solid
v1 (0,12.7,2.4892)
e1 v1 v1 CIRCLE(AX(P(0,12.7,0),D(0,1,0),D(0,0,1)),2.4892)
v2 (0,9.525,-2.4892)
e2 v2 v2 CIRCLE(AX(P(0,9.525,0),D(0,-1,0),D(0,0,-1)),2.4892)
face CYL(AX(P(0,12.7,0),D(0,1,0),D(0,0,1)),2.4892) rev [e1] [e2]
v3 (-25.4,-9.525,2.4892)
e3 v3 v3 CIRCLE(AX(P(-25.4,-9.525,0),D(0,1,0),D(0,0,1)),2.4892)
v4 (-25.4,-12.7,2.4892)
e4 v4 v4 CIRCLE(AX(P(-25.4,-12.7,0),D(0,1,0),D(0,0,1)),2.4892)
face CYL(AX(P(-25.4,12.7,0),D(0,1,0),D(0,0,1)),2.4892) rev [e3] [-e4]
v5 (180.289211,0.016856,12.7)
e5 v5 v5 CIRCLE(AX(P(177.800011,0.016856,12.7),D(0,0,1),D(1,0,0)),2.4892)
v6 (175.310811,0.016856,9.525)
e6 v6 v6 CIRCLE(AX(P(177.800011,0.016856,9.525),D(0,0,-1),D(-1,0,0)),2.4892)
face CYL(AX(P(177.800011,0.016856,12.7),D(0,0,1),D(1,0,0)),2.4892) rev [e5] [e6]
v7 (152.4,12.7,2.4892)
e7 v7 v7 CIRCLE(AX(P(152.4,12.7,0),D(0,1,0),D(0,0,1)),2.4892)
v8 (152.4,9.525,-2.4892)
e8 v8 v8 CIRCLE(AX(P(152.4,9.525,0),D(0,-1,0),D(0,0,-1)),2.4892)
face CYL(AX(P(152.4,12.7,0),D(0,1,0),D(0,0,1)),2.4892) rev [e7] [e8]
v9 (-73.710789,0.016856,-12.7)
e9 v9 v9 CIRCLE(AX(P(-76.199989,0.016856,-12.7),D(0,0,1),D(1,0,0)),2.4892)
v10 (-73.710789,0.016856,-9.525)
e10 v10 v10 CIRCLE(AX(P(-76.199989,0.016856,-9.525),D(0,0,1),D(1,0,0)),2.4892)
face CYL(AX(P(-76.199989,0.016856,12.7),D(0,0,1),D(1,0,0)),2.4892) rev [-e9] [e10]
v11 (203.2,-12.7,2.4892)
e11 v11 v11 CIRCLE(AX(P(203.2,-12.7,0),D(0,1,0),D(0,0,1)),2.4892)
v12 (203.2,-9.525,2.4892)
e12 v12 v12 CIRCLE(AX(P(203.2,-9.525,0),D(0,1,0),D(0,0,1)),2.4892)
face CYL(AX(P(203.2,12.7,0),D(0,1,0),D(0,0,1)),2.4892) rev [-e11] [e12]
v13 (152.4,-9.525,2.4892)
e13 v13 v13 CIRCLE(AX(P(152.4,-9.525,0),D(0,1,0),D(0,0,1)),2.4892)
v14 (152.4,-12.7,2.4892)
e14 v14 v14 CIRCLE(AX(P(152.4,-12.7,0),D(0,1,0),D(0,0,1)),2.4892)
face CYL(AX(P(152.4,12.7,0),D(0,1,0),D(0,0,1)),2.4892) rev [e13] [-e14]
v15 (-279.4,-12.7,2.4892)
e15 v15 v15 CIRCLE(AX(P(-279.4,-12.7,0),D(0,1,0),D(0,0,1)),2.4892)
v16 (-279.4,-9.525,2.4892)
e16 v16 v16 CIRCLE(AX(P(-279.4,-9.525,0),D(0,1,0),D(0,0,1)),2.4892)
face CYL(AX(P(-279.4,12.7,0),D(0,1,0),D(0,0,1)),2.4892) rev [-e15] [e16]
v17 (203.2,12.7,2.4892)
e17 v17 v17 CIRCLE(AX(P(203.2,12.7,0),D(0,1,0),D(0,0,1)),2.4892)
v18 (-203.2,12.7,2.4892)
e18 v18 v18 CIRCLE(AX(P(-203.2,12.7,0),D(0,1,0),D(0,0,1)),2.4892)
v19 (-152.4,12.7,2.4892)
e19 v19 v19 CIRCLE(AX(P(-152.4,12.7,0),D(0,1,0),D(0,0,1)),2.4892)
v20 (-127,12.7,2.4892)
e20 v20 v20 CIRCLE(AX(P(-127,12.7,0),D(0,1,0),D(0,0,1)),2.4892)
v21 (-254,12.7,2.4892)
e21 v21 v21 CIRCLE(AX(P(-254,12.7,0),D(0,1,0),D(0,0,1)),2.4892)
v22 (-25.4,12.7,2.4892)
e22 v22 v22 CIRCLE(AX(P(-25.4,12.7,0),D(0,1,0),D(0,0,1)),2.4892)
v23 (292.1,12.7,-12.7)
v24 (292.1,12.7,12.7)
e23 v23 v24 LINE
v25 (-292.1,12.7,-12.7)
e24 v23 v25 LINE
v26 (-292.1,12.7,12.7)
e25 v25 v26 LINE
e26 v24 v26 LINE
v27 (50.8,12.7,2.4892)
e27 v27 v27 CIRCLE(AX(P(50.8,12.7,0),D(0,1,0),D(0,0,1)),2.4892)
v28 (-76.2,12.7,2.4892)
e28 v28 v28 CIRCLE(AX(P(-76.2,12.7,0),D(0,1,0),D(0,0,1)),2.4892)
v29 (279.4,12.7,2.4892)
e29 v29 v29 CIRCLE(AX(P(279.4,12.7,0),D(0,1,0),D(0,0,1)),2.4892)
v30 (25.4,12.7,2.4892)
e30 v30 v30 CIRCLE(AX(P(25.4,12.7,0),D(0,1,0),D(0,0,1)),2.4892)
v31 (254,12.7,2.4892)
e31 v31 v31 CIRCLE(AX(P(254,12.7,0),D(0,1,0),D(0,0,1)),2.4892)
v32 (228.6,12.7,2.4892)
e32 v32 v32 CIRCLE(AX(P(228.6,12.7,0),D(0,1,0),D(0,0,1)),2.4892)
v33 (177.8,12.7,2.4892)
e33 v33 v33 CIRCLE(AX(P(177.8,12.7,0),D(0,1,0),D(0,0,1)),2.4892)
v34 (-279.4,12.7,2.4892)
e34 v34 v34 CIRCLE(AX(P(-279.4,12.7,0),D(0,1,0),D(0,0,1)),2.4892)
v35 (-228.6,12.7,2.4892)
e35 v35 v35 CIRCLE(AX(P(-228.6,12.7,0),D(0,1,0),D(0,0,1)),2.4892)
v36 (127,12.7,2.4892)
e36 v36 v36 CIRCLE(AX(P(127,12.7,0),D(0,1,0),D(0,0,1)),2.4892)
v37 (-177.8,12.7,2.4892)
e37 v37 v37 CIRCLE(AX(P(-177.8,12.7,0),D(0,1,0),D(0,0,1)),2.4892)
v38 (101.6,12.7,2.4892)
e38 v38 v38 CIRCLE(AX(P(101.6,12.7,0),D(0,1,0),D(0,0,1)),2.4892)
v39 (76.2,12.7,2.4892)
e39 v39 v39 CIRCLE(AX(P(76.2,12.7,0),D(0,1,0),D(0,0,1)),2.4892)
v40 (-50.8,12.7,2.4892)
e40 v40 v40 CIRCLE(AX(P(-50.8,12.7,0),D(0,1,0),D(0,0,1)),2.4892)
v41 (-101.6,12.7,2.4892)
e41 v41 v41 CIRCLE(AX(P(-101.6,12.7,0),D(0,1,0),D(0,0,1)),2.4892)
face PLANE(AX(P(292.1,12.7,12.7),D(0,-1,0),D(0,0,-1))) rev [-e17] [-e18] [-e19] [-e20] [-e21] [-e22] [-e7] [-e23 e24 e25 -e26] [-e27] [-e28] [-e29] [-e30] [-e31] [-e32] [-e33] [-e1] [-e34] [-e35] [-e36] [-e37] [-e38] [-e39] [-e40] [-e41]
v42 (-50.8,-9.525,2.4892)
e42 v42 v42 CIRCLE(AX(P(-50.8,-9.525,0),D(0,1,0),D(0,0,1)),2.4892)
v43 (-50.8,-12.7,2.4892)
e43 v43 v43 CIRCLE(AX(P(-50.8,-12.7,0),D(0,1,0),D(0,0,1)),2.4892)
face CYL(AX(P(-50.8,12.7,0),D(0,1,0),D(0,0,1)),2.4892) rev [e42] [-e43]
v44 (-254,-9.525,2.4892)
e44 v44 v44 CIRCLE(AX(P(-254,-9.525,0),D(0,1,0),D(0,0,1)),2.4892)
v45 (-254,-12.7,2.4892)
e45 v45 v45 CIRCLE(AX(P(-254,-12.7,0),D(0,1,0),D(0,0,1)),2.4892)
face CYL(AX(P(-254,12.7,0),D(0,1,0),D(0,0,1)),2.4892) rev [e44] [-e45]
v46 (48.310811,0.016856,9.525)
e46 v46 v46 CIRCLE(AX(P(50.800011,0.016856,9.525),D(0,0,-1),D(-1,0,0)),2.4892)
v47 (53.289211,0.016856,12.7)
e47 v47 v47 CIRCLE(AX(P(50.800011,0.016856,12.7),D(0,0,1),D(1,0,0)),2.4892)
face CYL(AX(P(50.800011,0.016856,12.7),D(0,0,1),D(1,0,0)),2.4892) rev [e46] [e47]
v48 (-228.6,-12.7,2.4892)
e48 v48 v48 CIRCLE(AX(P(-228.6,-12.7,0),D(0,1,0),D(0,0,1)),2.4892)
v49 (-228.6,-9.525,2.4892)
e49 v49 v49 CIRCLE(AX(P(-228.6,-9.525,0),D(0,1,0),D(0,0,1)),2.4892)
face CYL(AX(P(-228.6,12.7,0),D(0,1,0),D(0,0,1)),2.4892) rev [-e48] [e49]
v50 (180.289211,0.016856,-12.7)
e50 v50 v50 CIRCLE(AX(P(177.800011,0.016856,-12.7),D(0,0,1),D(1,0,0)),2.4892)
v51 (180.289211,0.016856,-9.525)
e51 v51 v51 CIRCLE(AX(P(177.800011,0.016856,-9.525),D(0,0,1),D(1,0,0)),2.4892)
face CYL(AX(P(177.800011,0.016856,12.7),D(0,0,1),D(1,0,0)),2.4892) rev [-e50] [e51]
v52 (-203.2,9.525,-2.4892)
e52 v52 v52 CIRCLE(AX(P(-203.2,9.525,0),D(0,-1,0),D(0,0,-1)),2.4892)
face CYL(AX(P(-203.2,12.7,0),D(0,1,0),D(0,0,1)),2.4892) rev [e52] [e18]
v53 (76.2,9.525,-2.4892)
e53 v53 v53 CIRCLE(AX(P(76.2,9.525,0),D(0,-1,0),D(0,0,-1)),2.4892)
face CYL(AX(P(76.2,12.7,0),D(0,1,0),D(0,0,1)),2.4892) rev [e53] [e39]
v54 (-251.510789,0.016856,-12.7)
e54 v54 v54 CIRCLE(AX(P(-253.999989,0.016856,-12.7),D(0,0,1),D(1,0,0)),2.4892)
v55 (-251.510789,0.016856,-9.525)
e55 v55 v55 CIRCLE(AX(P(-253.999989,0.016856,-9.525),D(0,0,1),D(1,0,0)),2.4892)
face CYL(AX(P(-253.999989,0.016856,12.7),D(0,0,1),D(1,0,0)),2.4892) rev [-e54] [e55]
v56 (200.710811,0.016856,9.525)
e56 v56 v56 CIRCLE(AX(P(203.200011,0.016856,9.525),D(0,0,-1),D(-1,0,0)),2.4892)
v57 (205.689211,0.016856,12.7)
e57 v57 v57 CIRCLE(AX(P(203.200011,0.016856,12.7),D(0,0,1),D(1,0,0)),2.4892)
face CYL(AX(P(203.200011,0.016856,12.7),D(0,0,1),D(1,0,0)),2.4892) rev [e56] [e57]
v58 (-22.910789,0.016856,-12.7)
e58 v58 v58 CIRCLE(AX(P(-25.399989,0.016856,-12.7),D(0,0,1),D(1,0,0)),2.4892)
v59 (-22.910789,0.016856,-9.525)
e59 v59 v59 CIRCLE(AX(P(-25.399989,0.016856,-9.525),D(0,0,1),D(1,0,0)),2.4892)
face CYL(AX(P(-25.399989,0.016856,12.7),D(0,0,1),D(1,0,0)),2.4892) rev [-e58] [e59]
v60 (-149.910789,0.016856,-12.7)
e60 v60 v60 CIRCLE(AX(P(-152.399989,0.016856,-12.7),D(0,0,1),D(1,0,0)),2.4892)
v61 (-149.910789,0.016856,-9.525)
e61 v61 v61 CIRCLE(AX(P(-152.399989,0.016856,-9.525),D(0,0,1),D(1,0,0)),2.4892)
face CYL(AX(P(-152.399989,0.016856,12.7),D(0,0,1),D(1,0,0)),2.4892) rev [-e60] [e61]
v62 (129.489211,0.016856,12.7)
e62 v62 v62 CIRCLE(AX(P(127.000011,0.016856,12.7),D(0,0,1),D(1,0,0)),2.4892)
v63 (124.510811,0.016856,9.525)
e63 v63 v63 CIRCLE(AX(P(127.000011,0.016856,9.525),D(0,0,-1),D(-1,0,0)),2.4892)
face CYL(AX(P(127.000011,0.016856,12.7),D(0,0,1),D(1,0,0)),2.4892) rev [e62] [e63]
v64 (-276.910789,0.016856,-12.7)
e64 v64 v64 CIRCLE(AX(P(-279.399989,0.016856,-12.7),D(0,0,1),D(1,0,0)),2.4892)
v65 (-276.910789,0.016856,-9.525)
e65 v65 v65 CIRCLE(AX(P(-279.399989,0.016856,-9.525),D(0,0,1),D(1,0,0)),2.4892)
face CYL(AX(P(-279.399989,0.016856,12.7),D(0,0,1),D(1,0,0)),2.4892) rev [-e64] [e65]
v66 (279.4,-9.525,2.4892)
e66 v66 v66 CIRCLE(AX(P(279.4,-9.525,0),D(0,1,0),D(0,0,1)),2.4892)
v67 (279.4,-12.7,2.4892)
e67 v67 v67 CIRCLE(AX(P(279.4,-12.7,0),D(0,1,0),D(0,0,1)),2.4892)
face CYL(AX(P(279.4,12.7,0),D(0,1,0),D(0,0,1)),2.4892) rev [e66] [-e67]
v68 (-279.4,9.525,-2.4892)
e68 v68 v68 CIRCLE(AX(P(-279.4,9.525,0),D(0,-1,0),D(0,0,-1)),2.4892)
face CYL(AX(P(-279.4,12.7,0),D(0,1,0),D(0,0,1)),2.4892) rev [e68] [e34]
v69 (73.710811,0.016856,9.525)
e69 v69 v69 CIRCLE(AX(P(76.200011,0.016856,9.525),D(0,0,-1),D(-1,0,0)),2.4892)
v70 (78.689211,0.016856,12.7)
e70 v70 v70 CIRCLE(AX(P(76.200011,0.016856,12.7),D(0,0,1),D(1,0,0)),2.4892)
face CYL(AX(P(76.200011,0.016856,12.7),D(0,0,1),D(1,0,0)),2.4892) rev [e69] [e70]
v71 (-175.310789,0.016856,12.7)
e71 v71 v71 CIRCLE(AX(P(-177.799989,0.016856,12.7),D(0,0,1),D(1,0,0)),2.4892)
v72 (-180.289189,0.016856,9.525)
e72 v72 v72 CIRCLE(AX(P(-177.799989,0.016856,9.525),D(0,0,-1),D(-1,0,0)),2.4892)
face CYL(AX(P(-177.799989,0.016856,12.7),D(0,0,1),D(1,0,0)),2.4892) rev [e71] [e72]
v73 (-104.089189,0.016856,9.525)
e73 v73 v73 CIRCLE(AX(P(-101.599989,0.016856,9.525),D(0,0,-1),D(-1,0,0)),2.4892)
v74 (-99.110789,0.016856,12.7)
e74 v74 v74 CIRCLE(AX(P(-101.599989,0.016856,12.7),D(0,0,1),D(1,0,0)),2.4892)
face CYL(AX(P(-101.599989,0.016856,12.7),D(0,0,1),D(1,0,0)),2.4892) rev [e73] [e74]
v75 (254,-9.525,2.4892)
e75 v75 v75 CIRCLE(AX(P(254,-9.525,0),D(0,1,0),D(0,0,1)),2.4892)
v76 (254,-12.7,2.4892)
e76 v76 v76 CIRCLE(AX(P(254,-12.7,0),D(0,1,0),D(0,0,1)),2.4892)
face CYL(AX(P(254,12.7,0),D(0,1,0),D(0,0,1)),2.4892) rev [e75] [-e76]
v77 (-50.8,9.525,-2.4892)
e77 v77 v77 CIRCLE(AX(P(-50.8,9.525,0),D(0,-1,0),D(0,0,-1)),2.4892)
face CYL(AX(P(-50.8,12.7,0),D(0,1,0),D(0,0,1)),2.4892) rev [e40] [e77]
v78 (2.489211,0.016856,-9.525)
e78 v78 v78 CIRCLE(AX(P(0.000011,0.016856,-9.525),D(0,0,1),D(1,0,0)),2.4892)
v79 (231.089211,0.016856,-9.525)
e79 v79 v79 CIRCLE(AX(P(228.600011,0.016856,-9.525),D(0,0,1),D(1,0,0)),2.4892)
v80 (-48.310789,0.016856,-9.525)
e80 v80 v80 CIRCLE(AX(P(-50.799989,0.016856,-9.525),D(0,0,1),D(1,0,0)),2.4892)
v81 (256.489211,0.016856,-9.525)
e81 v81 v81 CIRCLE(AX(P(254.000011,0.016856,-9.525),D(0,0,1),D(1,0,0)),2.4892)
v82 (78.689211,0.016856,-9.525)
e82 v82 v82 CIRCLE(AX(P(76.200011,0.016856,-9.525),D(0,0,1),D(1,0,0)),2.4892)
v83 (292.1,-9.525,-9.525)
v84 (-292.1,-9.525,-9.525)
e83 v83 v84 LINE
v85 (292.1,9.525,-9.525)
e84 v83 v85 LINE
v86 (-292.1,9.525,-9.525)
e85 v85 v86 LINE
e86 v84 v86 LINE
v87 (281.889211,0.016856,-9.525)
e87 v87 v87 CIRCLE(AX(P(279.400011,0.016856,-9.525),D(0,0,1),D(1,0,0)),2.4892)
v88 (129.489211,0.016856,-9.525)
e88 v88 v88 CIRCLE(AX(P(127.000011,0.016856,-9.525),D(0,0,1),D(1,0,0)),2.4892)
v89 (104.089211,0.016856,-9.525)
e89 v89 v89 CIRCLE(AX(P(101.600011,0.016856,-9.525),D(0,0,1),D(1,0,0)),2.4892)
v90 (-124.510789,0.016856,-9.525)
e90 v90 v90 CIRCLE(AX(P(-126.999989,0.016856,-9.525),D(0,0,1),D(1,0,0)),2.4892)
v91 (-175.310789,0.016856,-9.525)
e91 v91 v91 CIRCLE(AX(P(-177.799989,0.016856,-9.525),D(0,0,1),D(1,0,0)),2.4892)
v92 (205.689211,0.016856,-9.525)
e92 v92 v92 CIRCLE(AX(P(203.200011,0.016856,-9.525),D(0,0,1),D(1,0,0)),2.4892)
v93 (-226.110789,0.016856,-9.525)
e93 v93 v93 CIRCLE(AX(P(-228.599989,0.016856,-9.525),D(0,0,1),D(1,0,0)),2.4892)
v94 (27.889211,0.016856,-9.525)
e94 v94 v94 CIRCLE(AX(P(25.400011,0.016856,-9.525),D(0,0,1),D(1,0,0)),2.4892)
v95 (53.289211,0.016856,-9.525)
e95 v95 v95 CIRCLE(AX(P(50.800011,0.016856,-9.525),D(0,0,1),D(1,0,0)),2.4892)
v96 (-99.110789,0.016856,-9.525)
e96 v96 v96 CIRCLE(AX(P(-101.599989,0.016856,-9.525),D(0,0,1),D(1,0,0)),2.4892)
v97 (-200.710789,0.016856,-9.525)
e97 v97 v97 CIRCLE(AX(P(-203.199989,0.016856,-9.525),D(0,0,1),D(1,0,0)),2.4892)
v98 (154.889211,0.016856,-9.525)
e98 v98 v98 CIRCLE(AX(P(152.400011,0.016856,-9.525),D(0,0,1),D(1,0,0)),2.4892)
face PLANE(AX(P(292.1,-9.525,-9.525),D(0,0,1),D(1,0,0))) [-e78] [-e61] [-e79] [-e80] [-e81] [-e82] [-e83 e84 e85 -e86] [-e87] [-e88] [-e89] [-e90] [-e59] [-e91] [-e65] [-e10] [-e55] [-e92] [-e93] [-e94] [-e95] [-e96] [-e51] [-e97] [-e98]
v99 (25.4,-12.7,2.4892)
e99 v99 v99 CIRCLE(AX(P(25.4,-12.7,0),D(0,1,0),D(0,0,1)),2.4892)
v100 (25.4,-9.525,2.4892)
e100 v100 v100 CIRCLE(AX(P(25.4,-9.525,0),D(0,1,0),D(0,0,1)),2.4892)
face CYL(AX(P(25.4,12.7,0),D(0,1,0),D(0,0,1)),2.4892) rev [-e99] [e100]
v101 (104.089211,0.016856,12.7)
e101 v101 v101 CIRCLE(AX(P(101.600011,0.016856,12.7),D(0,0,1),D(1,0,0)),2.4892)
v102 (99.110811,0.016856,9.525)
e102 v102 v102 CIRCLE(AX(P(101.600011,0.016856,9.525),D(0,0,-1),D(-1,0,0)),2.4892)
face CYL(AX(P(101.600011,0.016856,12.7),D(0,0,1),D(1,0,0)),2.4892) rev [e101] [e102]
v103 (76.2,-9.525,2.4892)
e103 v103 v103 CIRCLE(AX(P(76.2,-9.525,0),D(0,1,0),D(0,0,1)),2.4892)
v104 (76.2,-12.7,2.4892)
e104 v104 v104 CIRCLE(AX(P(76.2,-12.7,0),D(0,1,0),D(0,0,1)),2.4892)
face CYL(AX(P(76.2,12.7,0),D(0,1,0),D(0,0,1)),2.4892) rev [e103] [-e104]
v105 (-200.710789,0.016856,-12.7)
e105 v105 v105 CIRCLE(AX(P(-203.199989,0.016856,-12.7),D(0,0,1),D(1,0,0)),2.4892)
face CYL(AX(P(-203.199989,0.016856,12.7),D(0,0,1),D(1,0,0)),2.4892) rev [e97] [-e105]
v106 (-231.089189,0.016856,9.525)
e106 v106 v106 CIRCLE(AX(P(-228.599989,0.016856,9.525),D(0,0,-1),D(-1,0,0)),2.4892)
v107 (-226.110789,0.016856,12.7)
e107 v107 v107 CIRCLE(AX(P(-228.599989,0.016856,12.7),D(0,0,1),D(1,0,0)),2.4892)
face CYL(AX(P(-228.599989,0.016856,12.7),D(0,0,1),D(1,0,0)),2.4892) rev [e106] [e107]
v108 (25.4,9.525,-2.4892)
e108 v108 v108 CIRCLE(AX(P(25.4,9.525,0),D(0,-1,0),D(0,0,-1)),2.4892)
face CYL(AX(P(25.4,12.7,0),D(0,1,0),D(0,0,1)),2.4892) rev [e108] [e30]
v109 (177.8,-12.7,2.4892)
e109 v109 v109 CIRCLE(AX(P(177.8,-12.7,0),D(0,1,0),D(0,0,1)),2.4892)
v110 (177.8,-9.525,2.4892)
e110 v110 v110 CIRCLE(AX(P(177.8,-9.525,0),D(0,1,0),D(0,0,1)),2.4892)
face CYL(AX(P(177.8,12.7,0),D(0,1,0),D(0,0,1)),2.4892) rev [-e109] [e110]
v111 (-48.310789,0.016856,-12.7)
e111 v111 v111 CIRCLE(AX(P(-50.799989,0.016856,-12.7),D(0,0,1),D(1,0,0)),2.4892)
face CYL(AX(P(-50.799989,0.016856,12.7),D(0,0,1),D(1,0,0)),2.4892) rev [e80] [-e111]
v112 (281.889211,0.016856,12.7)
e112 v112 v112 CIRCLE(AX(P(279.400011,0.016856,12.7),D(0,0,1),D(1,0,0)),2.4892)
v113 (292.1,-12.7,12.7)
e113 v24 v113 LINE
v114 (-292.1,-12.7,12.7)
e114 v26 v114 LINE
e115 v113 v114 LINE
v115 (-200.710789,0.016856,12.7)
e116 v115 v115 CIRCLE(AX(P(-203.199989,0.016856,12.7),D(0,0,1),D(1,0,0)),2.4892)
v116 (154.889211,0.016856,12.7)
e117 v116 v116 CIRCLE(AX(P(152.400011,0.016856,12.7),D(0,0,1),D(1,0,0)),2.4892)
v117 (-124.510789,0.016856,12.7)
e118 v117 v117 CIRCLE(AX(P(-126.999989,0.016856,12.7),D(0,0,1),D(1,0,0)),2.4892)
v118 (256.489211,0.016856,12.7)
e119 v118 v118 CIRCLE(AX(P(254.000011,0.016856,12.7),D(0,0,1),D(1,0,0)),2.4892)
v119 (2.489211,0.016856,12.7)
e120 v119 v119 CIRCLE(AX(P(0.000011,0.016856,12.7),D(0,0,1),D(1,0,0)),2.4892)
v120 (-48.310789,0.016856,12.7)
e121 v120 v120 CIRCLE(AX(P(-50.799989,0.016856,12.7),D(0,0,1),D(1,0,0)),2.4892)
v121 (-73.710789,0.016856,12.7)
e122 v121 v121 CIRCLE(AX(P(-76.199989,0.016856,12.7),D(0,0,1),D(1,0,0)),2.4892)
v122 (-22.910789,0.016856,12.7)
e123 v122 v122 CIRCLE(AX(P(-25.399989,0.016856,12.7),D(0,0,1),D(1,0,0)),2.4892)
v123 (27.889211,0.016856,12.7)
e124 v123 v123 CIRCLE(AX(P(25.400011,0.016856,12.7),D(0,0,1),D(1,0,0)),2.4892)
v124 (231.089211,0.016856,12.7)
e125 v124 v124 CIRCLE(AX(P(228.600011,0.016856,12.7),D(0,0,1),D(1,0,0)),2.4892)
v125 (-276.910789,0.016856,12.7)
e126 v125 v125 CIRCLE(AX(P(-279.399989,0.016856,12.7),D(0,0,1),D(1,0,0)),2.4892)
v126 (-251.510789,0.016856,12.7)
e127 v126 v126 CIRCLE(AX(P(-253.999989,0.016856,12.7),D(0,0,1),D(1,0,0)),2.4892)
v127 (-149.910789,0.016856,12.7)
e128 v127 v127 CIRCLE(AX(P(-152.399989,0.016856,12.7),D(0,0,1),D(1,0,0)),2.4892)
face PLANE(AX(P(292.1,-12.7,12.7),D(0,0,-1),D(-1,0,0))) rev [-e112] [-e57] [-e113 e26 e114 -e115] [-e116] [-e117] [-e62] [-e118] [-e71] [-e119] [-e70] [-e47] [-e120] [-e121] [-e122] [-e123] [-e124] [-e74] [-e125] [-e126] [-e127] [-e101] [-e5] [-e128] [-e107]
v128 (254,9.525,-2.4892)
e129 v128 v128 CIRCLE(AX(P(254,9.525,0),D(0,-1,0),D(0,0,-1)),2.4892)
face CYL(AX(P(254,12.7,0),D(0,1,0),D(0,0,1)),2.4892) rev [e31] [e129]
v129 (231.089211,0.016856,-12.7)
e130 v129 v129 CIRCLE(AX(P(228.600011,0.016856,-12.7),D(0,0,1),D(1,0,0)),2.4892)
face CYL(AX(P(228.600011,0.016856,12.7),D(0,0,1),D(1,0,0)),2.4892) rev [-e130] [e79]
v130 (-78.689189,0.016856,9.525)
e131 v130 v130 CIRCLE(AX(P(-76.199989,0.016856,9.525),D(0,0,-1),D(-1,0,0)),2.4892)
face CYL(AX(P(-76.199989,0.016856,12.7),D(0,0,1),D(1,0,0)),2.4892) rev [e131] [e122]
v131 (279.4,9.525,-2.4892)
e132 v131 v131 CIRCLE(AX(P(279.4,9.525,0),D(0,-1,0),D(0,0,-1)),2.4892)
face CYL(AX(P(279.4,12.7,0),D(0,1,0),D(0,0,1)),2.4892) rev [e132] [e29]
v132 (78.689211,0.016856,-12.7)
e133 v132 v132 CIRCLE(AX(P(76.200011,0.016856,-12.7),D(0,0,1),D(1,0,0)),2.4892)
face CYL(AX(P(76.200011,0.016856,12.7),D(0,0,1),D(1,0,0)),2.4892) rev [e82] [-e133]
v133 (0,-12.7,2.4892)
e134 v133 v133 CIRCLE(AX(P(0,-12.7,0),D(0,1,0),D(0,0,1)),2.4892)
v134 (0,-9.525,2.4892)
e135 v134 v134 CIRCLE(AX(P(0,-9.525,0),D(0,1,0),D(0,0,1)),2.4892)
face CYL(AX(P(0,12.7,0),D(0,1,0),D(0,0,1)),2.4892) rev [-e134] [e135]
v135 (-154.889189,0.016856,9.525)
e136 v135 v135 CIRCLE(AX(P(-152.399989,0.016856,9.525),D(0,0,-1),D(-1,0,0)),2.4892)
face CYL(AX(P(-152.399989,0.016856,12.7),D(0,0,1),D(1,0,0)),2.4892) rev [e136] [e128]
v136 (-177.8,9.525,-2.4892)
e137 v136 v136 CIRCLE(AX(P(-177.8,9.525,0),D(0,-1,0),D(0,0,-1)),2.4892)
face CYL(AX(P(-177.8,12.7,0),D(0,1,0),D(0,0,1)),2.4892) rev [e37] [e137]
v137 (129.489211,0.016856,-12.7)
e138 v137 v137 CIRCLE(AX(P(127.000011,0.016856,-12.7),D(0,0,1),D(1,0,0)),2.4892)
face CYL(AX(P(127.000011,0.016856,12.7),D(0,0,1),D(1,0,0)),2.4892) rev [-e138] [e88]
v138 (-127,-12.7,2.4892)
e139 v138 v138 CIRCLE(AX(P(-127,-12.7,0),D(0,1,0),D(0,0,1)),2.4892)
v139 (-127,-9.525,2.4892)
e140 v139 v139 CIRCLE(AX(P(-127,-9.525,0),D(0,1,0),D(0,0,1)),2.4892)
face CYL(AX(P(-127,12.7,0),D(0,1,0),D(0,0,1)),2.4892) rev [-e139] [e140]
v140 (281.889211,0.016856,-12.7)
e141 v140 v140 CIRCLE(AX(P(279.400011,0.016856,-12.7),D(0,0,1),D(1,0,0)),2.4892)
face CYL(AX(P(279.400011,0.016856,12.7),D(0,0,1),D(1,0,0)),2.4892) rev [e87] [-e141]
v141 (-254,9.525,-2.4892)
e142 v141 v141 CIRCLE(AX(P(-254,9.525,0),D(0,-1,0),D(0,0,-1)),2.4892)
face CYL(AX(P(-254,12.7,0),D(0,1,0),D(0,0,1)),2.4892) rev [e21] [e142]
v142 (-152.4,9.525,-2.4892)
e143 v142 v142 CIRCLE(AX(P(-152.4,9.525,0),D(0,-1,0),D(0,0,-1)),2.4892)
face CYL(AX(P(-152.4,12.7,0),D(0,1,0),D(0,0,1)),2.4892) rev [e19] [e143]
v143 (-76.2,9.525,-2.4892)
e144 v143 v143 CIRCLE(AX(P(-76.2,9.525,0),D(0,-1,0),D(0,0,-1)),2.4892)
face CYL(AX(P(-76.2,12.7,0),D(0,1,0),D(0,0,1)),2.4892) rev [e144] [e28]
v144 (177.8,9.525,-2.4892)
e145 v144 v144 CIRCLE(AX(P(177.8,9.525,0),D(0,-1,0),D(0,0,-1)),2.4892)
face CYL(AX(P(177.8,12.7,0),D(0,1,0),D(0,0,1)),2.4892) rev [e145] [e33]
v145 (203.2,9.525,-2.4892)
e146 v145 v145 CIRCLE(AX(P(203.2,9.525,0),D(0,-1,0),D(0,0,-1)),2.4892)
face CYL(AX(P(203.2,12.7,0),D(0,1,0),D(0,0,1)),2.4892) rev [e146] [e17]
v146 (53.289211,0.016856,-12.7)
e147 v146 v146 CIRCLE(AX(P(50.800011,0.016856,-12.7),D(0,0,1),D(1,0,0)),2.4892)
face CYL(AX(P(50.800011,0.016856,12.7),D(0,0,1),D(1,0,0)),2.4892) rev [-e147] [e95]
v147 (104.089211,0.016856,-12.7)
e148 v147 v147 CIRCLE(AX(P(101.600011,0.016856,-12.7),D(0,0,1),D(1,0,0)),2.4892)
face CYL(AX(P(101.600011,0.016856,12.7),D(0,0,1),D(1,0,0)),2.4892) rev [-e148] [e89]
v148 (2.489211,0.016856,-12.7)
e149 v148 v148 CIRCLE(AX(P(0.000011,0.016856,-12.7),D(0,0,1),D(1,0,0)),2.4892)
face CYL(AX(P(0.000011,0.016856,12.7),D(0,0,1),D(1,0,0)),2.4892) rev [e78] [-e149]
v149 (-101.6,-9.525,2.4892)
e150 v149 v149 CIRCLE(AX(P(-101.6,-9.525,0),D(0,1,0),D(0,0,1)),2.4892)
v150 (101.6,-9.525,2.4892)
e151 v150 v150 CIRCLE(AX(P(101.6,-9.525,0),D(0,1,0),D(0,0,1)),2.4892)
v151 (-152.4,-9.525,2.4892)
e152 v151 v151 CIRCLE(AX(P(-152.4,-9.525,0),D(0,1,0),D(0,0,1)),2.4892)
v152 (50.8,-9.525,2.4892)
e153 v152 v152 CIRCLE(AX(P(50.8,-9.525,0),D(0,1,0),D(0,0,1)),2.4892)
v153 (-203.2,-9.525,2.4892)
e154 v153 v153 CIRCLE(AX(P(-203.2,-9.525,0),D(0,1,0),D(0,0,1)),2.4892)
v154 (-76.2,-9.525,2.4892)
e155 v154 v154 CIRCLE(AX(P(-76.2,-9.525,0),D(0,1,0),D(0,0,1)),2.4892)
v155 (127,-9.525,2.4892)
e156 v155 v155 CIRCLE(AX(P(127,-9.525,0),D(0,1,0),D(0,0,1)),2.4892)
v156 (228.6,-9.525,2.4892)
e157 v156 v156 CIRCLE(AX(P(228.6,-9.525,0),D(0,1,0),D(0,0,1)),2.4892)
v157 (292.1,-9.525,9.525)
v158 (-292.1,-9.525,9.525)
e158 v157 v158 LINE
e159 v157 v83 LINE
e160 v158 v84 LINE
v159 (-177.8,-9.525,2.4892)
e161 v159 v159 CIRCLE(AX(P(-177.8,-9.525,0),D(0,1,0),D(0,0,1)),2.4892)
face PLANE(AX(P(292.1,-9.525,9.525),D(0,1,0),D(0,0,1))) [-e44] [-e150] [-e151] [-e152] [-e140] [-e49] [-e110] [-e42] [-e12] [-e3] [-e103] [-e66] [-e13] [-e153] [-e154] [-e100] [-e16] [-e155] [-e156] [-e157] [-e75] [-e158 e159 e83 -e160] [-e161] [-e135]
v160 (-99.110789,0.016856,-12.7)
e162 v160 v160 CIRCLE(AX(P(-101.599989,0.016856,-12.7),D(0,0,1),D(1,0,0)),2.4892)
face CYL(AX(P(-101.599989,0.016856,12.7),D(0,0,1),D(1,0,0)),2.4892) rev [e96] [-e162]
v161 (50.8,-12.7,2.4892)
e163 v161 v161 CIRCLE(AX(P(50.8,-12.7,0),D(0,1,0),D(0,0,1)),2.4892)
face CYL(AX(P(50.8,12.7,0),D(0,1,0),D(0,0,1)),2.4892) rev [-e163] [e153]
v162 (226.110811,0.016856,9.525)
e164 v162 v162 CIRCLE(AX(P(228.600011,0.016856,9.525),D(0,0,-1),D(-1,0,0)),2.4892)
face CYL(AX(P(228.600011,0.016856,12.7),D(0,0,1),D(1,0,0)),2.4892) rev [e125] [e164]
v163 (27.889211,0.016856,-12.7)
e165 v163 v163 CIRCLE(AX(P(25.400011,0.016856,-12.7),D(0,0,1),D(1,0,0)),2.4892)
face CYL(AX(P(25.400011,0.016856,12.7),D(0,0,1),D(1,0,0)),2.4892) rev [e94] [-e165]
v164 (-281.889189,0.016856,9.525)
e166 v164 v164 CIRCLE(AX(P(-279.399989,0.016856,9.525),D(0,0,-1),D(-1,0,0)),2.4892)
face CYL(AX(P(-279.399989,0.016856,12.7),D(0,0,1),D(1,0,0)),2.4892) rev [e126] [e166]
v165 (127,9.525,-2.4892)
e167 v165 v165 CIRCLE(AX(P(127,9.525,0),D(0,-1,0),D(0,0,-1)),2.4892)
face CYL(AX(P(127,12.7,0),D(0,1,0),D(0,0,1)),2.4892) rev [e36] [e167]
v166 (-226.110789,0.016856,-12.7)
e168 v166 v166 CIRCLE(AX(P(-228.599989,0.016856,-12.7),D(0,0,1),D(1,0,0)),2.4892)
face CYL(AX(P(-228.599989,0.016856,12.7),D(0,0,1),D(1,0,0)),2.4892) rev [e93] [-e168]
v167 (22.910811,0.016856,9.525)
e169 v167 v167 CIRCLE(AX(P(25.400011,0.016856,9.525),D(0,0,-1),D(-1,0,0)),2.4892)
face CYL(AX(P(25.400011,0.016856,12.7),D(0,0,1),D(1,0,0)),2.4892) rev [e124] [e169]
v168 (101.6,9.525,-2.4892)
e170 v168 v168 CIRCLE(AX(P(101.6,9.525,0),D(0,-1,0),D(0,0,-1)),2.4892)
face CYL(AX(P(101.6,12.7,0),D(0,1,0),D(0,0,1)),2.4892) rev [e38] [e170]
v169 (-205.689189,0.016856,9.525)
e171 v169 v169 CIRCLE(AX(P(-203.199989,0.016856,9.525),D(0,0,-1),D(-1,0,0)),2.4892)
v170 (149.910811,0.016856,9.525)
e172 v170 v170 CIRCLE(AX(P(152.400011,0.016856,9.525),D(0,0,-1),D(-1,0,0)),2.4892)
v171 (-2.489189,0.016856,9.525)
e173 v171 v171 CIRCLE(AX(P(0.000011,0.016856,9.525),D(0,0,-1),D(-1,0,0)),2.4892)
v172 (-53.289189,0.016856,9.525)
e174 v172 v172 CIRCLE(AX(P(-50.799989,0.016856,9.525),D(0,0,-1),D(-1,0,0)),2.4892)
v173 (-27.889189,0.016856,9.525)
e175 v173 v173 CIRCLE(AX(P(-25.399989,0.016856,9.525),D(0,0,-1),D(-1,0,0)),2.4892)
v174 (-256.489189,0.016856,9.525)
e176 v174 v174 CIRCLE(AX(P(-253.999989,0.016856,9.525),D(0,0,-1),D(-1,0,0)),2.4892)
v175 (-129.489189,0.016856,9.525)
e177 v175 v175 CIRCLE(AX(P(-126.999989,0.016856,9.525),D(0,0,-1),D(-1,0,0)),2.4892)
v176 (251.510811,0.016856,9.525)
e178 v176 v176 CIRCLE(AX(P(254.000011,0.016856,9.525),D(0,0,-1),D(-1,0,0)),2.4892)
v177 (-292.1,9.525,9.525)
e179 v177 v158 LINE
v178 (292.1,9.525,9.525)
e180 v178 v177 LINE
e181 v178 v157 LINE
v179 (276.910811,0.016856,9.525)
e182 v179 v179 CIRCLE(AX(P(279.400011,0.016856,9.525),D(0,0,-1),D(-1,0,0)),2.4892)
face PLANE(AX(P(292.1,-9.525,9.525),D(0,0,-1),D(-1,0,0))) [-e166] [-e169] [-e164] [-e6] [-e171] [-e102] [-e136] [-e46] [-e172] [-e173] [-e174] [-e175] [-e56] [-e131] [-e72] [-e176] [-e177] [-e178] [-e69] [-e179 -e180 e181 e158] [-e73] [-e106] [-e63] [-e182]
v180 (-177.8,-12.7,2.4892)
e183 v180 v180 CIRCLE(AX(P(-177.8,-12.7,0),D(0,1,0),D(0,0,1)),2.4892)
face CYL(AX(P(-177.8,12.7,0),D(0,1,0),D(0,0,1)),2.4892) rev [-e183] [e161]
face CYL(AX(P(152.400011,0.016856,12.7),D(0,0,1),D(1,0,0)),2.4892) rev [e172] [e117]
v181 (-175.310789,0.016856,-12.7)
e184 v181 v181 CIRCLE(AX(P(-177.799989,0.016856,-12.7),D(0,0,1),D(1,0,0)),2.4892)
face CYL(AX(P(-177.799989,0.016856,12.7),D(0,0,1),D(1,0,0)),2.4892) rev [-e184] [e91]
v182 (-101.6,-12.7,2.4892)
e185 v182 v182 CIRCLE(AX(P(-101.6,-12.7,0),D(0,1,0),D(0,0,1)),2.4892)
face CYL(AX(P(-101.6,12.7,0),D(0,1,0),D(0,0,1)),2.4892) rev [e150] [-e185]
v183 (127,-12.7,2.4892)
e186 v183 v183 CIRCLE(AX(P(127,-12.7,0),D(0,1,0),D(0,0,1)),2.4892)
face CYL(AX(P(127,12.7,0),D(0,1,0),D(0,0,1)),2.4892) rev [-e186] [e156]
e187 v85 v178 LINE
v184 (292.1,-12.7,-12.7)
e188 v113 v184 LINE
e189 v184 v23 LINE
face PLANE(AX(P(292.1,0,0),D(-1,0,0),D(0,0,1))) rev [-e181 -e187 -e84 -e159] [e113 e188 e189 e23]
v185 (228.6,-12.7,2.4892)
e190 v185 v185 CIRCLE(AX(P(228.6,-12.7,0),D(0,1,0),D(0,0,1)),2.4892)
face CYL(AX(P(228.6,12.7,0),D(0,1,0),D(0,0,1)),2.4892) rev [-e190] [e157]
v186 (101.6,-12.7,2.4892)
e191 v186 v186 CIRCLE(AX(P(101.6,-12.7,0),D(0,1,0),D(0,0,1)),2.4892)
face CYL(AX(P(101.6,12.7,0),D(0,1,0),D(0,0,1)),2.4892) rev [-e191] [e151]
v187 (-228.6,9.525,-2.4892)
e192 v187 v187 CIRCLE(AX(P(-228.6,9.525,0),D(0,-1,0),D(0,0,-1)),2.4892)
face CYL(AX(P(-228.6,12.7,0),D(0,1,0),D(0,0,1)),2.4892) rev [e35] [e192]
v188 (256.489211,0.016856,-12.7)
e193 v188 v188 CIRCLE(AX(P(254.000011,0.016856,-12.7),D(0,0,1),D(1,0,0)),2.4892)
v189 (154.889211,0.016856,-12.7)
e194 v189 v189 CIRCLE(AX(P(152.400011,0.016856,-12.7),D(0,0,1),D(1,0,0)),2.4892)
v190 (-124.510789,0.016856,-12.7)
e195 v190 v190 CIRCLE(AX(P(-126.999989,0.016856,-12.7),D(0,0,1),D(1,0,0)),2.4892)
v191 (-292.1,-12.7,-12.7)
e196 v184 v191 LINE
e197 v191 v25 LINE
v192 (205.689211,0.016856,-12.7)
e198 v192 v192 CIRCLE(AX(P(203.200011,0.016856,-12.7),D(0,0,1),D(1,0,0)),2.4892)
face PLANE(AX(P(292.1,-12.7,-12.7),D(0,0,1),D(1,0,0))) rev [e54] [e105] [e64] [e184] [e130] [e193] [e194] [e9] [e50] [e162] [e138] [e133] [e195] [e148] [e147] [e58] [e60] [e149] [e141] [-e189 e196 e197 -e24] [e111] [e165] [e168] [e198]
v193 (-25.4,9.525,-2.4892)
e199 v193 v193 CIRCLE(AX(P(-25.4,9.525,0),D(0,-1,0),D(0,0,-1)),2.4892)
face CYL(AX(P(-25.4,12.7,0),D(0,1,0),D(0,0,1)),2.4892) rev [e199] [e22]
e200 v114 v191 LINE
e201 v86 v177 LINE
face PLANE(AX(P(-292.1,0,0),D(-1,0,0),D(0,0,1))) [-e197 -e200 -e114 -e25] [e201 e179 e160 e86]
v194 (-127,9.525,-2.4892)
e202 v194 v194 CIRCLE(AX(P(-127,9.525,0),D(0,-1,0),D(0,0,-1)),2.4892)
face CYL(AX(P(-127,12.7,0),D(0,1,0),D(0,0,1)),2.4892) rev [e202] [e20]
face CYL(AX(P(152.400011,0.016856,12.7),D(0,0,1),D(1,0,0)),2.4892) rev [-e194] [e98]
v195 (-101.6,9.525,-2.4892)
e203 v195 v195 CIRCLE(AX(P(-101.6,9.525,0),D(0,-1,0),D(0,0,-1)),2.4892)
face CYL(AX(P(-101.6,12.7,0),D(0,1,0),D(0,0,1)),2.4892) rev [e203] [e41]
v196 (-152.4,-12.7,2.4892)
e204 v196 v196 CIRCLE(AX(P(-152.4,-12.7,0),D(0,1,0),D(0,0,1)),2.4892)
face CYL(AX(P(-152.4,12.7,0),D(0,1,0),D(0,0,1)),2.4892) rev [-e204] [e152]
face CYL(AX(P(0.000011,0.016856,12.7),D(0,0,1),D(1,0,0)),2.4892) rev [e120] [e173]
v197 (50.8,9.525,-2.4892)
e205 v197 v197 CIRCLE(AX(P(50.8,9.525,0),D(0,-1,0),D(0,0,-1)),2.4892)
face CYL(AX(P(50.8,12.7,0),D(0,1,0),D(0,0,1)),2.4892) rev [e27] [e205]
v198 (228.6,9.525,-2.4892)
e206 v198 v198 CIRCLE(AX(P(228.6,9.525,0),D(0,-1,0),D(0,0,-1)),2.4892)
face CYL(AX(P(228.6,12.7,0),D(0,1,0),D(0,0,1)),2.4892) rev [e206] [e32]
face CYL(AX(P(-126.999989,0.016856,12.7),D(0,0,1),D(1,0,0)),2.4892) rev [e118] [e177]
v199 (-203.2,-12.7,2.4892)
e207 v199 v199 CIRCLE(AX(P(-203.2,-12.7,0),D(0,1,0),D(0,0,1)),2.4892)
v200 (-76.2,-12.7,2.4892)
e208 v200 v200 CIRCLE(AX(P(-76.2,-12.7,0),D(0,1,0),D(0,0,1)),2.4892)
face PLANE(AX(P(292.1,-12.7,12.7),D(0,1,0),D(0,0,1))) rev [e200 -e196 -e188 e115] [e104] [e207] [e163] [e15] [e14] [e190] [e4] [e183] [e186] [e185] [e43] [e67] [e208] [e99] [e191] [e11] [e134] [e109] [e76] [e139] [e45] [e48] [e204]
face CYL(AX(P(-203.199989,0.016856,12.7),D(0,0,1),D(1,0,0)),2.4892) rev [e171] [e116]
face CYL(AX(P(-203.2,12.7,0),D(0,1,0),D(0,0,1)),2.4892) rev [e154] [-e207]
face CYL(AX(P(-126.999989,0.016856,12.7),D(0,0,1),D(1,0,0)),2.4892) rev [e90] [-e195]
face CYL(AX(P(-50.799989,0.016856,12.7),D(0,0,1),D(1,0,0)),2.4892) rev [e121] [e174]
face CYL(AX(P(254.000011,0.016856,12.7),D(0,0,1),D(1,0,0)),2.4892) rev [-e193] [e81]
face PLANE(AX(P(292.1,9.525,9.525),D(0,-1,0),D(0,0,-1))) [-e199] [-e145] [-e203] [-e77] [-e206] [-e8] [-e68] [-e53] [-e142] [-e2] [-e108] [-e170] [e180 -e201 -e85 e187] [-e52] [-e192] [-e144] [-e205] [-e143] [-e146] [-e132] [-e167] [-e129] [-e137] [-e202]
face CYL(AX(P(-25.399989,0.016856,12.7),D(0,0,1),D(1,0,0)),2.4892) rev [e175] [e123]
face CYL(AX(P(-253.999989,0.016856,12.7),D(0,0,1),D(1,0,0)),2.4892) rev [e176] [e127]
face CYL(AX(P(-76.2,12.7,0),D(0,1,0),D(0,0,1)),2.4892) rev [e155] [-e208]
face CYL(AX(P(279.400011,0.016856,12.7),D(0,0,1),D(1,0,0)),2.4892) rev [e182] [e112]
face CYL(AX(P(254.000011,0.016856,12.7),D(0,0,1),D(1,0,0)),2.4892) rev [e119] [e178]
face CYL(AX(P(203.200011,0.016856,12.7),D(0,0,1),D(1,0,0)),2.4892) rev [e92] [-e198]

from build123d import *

# Parameters (mm, degrees)
SKETCH1_W             = 25.4
SKETCH1_H             = 25.4
SKETCH1_W_2           = 19.05
SKETCH1_H_2           = 19.05
BOSS_EXTRUDE1_DEPTH   = 292.1
SKETCH3_W             = 2.4892
SKETCH3_H             = 25.4
SKETCH3_AT_POINT_2_W  = 2.4892
SKETCH3_AT_POINT_2_H  = 25.4
LPATTERN1_START       = -12.7
LPATTERN1_OUTLINE_R   = 2.4892
LPATTERN1_DEPTH       = 25.4
LPATTERN1_2_OUTLINE_R = 2.4892
LPATTERN1_2_DEPTH     = 25.4


# Read off the part's stored shape, not the designer's step: LPattern1
with BuildPart() as part:
    # Sketch1 → Boss-Extrude1 (new, symmetric)
    with BuildSketch(Plane(origin=(0, 0, 0), x_dir=(0, 0, -1), z_dir=(1, 0, 0))):
        Rectangle(SKETCH1_W, SKETCH1_H)
        Rectangle(SKETCH1_W_2, SKETCH1_H_2, mode=Mode.SUBTRACT)
    extrude(amount=BOSS_EXTRUDE1_DEPTH, both=True)

    # Sketch3 → #9 (0.196) Diameter Hole1 (revolve, cut)
    with BuildSketch(Plane(origin=(279.4, 12.7, 0), x_dir=(0, 0, 1), z_dir=(1, 0, 0))):
        with Locations((1.2446, 12.7)):
            Rectangle(SKETCH3_W, SKETCH3_H)
    revolve(axis=Axis((279.4, 19.05, 0), (0, -1, 0)), mode=Mode.SUBTRACT)

    # Sketch3 at point 2 (carried to point 2, square into its face) → #9 (0.196) Diameter Hole1 at 2 (revolve, cut)
    with BuildSketch(Plane(origin=(279.400011186, 0.016856195, 12.7), x_dir=(0, -1, 0), z_dir=(1, 0, 0))):
        with Locations((1.2446, 12.7)):
            Rectangle(SKETCH3_AT_POINT_2_W, SKETCH3_AT_POINT_2_H)
    revolve(axis=Axis((279.400011186, 0.016856195, 19.05), (0, 0, -1)), mode=Mode.SUBTRACT)

    # LPattern1 outline → LPattern1 (cut)
    with BuildSketch(Plane.XY.offset(LPATTERN1_START)):
        with Locations((254.000011186, 0.016856195)):
            Circle(LPATTERN1_OUTLINE_R)
        with Locations((228.600011186, 0.016856195)):
            Circle(LPATTERN1_OUTLINE_R)
        with Locations((203.200011186, 0.016856195)):
            Circle(LPATTERN1_OUTLINE_R)
        with Locations((177.800011186, 0.016856195)):
            Circle(LPATTERN1_OUTLINE_R)
        with Locations((152.400011186, 0.016856195)):
            Circle(LPATTERN1_OUTLINE_R)
        with Locations((127.000011186, 0.016856195)):
            Circle(LPATTERN1_OUTLINE_R)
        with Locations((101.600011186, 0.016856195)):
            Circle(LPATTERN1_OUTLINE_R)
        with Locations((76.200011186, 0.016856195)):
            Circle(LPATTERN1_OUTLINE_R)
        with Locations((50.800011186, 0.016856195)):
            Circle(LPATTERN1_OUTLINE_R)
        with Locations((25.400011186, 0.016856195)):
            Circle(LPATTERN1_OUTLINE_R)
        with Locations((1.1186e-05, 0.016856195)):
            Circle(LPATTERN1_OUTLINE_R)
        with Locations((-25.399988814, 0.016856195)):
            Circle(LPATTERN1_OUTLINE_R)
        with Locations((-50.799988814, 0.016856195)):
            Circle(LPATTERN1_OUTLINE_R)
        with Locations((-76.199988814, 0.016856195)):
            Circle(LPATTERN1_OUTLINE_R)
        with Locations((-101.599988814, 0.016856195)):
            Circle(LPATTERN1_OUTLINE_R)
        with Locations((-126.999988814, 0.016856195)):
            Circle(LPATTERN1_OUTLINE_R)
        with Locations((-152.399988814, 0.016856195)):
            Circle(LPATTERN1_OUTLINE_R)
        with Locations((-177.799988814, 0.016856195)):
            Circle(LPATTERN1_OUTLINE_R)
        with Locations((-203.199988814, 0.016856195)):
            Circle(LPATTERN1_OUTLINE_R)
        with Locations((-228.599988814, 0.016856195)):
            Circle(LPATTERN1_OUTLINE_R)
        with Locations((-253.999988814, 0.016856195)):
            Circle(LPATTERN1_OUTLINE_R)
        with Locations((-279.399988814, 0.016856195)):
            Circle(LPATTERN1_OUTLINE_R)
    extrude(amount=LPATTERN1_DEPTH, mode=Mode.SUBTRACT)

    # LPattern1 2 outline → LPattern1 2 (cut)
    with BuildSketch(Plane(origin=(0, 0, 0), x_dir=(1, 0, 0), z_dir=(0, 1, 0)).offset(LPATTERN1_START)):
        with Locations((254, 0)):
            Circle(LPATTERN1_2_OUTLINE_R)
        with Locations((228.6, 0)):
            Circle(LPATTERN1_2_OUTLINE_R)
        with Locations((203.2, 0)):
            Circle(LPATTERN1_2_OUTLINE_R)
        with Locations((177.8, 0)):
            Circle(LPATTERN1_2_OUTLINE_R)
        with Locations((152.4, 0)):
            Circle(LPATTERN1_2_OUTLINE_R)
        with Locations((127, 0)):
            Circle(LPATTERN1_2_OUTLINE_R)
        with Locations((101.6, 0)):
            Circle(LPATTERN1_2_OUTLINE_R)
        with Locations((76.2, 0)):
            Circle(LPATTERN1_2_OUTLINE_R)
        with Locations((50.8, 0)):
            Circle(LPATTERN1_2_OUTLINE_R)
        with Locations((25.4, 0)):
            Circle(LPATTERN1_2_OUTLINE_R)
        Circle(LPATTERN1_2_OUTLINE_R)
        with Locations((-25.4, 0)):
            Circle(LPATTERN1_2_OUTLINE_R)
        with Locations((-50.8, 0)):
            Circle(LPATTERN1_2_OUTLINE_R)
        with Locations((-76.2, 0)):
            Circle(LPATTERN1_2_OUTLINE_R)
        with Locations((-101.6, 0)):
            Circle(LPATTERN1_2_OUTLINE_R)
        with Locations((-127, 0)):
            Circle(LPATTERN1_2_OUTLINE_R)
        with Locations((-152.4, 0)):
            Circle(LPATTERN1_2_OUTLINE_R)
        with Locations((-177.8, 0)):
            Circle(LPATTERN1_2_OUTLINE_R)
        with Locations((-203.2, 0)):
            Circle(LPATTERN1_2_OUTLINE_R)
        with Locations((-228.6, 0)):
            Circle(LPATTERN1_2_OUTLINE_R)
        with Locations((-254, 0)):
            Circle(LPATTERN1_2_OUTLINE_R)
        with Locations((-279.4, 0)):
            Circle(LPATTERN1_2_OUTLINE_R)
    extrude(amount=LPATTERN1_2_DEPTH, mode=Mode.SUBTRACT)


solid = part.part
